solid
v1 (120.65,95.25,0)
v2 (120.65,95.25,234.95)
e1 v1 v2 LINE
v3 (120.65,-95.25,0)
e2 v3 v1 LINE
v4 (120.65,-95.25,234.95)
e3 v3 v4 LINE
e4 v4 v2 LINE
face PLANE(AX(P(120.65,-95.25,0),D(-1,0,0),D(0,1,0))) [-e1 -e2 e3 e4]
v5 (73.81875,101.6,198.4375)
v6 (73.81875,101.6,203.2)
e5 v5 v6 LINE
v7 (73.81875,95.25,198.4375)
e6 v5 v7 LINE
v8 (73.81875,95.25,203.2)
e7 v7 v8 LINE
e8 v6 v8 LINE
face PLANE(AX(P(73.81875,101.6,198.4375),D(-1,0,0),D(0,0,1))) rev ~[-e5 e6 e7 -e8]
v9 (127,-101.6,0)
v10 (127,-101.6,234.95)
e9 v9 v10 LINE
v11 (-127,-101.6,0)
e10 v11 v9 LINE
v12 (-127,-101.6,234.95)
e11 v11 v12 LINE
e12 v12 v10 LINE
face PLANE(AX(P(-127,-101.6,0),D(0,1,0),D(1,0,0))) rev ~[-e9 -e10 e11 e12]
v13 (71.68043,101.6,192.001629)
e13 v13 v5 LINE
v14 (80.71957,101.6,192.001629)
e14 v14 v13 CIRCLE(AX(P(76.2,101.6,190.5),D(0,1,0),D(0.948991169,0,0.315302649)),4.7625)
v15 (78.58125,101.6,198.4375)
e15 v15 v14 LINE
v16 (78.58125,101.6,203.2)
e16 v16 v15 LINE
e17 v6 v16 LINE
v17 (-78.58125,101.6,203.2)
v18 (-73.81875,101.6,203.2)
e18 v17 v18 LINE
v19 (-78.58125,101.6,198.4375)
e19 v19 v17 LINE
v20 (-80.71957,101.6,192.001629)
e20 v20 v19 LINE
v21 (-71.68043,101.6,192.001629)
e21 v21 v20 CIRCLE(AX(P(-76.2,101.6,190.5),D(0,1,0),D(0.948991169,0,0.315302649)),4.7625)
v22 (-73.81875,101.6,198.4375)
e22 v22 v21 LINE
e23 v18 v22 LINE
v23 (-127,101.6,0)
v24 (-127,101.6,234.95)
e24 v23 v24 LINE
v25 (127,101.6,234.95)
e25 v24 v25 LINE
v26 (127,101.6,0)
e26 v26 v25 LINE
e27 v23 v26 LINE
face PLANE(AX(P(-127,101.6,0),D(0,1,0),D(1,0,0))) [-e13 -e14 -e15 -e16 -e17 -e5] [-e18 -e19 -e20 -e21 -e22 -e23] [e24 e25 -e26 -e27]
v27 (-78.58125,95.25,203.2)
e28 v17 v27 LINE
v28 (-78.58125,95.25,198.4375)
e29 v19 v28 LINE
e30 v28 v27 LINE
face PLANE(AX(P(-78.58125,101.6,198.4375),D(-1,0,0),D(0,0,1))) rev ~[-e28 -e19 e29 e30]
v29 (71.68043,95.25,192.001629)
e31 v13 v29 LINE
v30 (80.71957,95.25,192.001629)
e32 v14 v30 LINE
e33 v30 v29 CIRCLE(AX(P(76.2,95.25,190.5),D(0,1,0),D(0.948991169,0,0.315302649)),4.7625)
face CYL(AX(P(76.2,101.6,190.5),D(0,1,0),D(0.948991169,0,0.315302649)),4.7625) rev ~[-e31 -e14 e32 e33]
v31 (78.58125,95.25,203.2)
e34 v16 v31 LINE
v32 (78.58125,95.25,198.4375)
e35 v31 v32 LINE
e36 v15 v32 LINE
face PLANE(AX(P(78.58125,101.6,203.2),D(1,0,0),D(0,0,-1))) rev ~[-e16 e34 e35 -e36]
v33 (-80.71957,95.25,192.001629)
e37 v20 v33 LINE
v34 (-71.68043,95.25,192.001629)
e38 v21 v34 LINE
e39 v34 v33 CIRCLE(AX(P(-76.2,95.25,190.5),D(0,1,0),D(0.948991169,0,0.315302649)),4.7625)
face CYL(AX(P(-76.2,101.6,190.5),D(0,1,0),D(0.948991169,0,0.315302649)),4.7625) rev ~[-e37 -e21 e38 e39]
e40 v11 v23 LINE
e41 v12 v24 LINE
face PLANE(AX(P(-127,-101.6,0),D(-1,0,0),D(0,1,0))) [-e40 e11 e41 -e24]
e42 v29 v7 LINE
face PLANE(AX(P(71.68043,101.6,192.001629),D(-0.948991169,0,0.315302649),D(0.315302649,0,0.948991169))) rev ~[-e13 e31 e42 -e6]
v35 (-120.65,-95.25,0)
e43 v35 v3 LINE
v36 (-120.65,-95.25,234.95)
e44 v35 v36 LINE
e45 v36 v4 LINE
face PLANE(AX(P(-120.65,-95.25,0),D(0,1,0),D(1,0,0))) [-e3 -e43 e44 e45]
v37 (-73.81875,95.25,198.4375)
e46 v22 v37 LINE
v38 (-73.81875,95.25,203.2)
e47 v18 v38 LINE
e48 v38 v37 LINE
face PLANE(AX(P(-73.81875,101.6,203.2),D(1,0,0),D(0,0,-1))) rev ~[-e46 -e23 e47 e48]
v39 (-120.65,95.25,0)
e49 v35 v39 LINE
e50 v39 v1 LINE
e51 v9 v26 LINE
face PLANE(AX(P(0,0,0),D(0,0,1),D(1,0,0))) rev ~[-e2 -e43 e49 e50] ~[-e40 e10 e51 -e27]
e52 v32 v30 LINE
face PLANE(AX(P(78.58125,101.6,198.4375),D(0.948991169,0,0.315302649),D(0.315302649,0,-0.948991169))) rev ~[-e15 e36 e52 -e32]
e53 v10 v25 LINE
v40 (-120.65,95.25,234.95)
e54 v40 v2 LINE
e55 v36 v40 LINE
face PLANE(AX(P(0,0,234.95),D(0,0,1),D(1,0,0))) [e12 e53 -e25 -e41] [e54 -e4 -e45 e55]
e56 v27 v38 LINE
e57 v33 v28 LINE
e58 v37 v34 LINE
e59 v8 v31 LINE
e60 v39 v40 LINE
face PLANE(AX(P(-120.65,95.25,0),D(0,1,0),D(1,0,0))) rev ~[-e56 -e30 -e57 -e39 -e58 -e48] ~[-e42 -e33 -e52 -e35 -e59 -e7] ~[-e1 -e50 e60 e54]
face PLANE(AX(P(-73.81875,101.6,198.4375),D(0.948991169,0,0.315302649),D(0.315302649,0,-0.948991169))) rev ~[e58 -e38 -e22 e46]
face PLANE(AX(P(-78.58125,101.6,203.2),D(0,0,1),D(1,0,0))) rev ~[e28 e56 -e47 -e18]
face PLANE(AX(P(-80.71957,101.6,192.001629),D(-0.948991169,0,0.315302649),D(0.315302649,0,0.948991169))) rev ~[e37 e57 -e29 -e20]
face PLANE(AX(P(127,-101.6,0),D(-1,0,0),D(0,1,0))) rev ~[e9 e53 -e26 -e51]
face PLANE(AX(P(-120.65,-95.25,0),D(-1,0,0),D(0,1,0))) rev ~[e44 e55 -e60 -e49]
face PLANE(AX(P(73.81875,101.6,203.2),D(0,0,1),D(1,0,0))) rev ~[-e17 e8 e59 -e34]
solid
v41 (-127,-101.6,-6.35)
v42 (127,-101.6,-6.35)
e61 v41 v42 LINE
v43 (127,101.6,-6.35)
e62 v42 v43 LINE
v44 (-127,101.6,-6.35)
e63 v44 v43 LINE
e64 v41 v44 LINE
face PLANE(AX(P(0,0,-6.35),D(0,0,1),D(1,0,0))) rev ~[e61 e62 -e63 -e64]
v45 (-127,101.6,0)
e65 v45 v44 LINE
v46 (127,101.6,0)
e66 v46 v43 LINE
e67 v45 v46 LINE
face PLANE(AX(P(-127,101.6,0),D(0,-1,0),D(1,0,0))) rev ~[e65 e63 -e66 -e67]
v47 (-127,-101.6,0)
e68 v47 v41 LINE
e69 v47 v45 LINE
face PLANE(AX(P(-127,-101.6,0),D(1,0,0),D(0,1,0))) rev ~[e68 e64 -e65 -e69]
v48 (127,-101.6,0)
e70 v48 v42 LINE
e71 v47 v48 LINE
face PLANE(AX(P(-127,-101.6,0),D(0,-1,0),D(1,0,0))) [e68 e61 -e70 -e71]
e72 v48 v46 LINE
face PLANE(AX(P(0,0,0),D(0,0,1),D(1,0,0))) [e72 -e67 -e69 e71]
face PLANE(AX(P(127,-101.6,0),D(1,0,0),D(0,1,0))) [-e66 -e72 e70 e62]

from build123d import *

# Parameters (mm, degrees)
F0_W     = 254
F0_H     = 203.2
F0_W_2   = 241.3
F0_H_2   = 190.5
F1_DEPTH = 234.95
F2_DEPTH = 6.35
F4_DEPTH = 12.7


# Not quite as in the source:
# - a feature of the source that left no trace in its solid (it failed there, or was rolled back) is left out


with BuildPart() as f1:
    # F0 (on Top) → F1 (new body)
    with BuildSketch(Plane.XY):
        Rectangle(F0_W, F0_H)
        Rectangle(F0_W_2, F0_H_2, mode=Mode.SUBTRACT)
    extrude(amount=F1_DEPTH)

    # F3 (on face) → F4 (cut)
    with BuildSketch(Plane(origin=(0, 101.6, 0), x_dir=(-1, 0, 0), z_dir=(0, 1, 0))):
        with BuildLine():
            ThreePointArc((-80.7195704438, 192.0016288669), (-76.2, 185.7375), (-71.6804295562, 192.0016288669))
            Line((-71.6804295562, 192.0016288669), (-73.81875, 198.4375))
            Line((-73.81875, 198.4375), (-73.81875, 203.2))
            Line((-73.81875, 203.2), (-78.58125, 203.2))
            Line((-78.58125, 203.2), (-78.58125, 198.4375))
            Line((-78.58125, 198.4375), (-80.7195704438, 192.0016288669))
        make_face()
        with BuildLine():
            Line((73.81875, 198.4375), (71.6804295562, 192.0016288669))
            ThreePointArc((71.6804295562, 192.0016288669), (76.2, 185.7375), (80.7195704438, 192.0016288669))
            Line((80.7195704438, 192.0016288669), (78.58125, 198.4375))
            Line((78.58125, 198.4375), (78.58125, 203.2))
            Line((78.58125, 203.2), (73.81875, 203.2))
            Line((73.81875, 203.2), (73.81875, 198.4375))
        make_face()
    extrude(amount=-F4_DEPTH, mode=Mode.SUBTRACT)


with BuildPart() as f2:
    # F0 (on Top) → F2 (new body)
    with BuildSketch(Plane.XY):
        Rectangle(F0_W, F0_H)
        Rectangle(F0_W_2, F0_H_2, mode=Mode.SUBTRACT)
        Rectangle(F0_W_2, F0_H_2)
    extrude(amount=-F2_DEPTH)


solid = Compound([f1.part, f2.part])
